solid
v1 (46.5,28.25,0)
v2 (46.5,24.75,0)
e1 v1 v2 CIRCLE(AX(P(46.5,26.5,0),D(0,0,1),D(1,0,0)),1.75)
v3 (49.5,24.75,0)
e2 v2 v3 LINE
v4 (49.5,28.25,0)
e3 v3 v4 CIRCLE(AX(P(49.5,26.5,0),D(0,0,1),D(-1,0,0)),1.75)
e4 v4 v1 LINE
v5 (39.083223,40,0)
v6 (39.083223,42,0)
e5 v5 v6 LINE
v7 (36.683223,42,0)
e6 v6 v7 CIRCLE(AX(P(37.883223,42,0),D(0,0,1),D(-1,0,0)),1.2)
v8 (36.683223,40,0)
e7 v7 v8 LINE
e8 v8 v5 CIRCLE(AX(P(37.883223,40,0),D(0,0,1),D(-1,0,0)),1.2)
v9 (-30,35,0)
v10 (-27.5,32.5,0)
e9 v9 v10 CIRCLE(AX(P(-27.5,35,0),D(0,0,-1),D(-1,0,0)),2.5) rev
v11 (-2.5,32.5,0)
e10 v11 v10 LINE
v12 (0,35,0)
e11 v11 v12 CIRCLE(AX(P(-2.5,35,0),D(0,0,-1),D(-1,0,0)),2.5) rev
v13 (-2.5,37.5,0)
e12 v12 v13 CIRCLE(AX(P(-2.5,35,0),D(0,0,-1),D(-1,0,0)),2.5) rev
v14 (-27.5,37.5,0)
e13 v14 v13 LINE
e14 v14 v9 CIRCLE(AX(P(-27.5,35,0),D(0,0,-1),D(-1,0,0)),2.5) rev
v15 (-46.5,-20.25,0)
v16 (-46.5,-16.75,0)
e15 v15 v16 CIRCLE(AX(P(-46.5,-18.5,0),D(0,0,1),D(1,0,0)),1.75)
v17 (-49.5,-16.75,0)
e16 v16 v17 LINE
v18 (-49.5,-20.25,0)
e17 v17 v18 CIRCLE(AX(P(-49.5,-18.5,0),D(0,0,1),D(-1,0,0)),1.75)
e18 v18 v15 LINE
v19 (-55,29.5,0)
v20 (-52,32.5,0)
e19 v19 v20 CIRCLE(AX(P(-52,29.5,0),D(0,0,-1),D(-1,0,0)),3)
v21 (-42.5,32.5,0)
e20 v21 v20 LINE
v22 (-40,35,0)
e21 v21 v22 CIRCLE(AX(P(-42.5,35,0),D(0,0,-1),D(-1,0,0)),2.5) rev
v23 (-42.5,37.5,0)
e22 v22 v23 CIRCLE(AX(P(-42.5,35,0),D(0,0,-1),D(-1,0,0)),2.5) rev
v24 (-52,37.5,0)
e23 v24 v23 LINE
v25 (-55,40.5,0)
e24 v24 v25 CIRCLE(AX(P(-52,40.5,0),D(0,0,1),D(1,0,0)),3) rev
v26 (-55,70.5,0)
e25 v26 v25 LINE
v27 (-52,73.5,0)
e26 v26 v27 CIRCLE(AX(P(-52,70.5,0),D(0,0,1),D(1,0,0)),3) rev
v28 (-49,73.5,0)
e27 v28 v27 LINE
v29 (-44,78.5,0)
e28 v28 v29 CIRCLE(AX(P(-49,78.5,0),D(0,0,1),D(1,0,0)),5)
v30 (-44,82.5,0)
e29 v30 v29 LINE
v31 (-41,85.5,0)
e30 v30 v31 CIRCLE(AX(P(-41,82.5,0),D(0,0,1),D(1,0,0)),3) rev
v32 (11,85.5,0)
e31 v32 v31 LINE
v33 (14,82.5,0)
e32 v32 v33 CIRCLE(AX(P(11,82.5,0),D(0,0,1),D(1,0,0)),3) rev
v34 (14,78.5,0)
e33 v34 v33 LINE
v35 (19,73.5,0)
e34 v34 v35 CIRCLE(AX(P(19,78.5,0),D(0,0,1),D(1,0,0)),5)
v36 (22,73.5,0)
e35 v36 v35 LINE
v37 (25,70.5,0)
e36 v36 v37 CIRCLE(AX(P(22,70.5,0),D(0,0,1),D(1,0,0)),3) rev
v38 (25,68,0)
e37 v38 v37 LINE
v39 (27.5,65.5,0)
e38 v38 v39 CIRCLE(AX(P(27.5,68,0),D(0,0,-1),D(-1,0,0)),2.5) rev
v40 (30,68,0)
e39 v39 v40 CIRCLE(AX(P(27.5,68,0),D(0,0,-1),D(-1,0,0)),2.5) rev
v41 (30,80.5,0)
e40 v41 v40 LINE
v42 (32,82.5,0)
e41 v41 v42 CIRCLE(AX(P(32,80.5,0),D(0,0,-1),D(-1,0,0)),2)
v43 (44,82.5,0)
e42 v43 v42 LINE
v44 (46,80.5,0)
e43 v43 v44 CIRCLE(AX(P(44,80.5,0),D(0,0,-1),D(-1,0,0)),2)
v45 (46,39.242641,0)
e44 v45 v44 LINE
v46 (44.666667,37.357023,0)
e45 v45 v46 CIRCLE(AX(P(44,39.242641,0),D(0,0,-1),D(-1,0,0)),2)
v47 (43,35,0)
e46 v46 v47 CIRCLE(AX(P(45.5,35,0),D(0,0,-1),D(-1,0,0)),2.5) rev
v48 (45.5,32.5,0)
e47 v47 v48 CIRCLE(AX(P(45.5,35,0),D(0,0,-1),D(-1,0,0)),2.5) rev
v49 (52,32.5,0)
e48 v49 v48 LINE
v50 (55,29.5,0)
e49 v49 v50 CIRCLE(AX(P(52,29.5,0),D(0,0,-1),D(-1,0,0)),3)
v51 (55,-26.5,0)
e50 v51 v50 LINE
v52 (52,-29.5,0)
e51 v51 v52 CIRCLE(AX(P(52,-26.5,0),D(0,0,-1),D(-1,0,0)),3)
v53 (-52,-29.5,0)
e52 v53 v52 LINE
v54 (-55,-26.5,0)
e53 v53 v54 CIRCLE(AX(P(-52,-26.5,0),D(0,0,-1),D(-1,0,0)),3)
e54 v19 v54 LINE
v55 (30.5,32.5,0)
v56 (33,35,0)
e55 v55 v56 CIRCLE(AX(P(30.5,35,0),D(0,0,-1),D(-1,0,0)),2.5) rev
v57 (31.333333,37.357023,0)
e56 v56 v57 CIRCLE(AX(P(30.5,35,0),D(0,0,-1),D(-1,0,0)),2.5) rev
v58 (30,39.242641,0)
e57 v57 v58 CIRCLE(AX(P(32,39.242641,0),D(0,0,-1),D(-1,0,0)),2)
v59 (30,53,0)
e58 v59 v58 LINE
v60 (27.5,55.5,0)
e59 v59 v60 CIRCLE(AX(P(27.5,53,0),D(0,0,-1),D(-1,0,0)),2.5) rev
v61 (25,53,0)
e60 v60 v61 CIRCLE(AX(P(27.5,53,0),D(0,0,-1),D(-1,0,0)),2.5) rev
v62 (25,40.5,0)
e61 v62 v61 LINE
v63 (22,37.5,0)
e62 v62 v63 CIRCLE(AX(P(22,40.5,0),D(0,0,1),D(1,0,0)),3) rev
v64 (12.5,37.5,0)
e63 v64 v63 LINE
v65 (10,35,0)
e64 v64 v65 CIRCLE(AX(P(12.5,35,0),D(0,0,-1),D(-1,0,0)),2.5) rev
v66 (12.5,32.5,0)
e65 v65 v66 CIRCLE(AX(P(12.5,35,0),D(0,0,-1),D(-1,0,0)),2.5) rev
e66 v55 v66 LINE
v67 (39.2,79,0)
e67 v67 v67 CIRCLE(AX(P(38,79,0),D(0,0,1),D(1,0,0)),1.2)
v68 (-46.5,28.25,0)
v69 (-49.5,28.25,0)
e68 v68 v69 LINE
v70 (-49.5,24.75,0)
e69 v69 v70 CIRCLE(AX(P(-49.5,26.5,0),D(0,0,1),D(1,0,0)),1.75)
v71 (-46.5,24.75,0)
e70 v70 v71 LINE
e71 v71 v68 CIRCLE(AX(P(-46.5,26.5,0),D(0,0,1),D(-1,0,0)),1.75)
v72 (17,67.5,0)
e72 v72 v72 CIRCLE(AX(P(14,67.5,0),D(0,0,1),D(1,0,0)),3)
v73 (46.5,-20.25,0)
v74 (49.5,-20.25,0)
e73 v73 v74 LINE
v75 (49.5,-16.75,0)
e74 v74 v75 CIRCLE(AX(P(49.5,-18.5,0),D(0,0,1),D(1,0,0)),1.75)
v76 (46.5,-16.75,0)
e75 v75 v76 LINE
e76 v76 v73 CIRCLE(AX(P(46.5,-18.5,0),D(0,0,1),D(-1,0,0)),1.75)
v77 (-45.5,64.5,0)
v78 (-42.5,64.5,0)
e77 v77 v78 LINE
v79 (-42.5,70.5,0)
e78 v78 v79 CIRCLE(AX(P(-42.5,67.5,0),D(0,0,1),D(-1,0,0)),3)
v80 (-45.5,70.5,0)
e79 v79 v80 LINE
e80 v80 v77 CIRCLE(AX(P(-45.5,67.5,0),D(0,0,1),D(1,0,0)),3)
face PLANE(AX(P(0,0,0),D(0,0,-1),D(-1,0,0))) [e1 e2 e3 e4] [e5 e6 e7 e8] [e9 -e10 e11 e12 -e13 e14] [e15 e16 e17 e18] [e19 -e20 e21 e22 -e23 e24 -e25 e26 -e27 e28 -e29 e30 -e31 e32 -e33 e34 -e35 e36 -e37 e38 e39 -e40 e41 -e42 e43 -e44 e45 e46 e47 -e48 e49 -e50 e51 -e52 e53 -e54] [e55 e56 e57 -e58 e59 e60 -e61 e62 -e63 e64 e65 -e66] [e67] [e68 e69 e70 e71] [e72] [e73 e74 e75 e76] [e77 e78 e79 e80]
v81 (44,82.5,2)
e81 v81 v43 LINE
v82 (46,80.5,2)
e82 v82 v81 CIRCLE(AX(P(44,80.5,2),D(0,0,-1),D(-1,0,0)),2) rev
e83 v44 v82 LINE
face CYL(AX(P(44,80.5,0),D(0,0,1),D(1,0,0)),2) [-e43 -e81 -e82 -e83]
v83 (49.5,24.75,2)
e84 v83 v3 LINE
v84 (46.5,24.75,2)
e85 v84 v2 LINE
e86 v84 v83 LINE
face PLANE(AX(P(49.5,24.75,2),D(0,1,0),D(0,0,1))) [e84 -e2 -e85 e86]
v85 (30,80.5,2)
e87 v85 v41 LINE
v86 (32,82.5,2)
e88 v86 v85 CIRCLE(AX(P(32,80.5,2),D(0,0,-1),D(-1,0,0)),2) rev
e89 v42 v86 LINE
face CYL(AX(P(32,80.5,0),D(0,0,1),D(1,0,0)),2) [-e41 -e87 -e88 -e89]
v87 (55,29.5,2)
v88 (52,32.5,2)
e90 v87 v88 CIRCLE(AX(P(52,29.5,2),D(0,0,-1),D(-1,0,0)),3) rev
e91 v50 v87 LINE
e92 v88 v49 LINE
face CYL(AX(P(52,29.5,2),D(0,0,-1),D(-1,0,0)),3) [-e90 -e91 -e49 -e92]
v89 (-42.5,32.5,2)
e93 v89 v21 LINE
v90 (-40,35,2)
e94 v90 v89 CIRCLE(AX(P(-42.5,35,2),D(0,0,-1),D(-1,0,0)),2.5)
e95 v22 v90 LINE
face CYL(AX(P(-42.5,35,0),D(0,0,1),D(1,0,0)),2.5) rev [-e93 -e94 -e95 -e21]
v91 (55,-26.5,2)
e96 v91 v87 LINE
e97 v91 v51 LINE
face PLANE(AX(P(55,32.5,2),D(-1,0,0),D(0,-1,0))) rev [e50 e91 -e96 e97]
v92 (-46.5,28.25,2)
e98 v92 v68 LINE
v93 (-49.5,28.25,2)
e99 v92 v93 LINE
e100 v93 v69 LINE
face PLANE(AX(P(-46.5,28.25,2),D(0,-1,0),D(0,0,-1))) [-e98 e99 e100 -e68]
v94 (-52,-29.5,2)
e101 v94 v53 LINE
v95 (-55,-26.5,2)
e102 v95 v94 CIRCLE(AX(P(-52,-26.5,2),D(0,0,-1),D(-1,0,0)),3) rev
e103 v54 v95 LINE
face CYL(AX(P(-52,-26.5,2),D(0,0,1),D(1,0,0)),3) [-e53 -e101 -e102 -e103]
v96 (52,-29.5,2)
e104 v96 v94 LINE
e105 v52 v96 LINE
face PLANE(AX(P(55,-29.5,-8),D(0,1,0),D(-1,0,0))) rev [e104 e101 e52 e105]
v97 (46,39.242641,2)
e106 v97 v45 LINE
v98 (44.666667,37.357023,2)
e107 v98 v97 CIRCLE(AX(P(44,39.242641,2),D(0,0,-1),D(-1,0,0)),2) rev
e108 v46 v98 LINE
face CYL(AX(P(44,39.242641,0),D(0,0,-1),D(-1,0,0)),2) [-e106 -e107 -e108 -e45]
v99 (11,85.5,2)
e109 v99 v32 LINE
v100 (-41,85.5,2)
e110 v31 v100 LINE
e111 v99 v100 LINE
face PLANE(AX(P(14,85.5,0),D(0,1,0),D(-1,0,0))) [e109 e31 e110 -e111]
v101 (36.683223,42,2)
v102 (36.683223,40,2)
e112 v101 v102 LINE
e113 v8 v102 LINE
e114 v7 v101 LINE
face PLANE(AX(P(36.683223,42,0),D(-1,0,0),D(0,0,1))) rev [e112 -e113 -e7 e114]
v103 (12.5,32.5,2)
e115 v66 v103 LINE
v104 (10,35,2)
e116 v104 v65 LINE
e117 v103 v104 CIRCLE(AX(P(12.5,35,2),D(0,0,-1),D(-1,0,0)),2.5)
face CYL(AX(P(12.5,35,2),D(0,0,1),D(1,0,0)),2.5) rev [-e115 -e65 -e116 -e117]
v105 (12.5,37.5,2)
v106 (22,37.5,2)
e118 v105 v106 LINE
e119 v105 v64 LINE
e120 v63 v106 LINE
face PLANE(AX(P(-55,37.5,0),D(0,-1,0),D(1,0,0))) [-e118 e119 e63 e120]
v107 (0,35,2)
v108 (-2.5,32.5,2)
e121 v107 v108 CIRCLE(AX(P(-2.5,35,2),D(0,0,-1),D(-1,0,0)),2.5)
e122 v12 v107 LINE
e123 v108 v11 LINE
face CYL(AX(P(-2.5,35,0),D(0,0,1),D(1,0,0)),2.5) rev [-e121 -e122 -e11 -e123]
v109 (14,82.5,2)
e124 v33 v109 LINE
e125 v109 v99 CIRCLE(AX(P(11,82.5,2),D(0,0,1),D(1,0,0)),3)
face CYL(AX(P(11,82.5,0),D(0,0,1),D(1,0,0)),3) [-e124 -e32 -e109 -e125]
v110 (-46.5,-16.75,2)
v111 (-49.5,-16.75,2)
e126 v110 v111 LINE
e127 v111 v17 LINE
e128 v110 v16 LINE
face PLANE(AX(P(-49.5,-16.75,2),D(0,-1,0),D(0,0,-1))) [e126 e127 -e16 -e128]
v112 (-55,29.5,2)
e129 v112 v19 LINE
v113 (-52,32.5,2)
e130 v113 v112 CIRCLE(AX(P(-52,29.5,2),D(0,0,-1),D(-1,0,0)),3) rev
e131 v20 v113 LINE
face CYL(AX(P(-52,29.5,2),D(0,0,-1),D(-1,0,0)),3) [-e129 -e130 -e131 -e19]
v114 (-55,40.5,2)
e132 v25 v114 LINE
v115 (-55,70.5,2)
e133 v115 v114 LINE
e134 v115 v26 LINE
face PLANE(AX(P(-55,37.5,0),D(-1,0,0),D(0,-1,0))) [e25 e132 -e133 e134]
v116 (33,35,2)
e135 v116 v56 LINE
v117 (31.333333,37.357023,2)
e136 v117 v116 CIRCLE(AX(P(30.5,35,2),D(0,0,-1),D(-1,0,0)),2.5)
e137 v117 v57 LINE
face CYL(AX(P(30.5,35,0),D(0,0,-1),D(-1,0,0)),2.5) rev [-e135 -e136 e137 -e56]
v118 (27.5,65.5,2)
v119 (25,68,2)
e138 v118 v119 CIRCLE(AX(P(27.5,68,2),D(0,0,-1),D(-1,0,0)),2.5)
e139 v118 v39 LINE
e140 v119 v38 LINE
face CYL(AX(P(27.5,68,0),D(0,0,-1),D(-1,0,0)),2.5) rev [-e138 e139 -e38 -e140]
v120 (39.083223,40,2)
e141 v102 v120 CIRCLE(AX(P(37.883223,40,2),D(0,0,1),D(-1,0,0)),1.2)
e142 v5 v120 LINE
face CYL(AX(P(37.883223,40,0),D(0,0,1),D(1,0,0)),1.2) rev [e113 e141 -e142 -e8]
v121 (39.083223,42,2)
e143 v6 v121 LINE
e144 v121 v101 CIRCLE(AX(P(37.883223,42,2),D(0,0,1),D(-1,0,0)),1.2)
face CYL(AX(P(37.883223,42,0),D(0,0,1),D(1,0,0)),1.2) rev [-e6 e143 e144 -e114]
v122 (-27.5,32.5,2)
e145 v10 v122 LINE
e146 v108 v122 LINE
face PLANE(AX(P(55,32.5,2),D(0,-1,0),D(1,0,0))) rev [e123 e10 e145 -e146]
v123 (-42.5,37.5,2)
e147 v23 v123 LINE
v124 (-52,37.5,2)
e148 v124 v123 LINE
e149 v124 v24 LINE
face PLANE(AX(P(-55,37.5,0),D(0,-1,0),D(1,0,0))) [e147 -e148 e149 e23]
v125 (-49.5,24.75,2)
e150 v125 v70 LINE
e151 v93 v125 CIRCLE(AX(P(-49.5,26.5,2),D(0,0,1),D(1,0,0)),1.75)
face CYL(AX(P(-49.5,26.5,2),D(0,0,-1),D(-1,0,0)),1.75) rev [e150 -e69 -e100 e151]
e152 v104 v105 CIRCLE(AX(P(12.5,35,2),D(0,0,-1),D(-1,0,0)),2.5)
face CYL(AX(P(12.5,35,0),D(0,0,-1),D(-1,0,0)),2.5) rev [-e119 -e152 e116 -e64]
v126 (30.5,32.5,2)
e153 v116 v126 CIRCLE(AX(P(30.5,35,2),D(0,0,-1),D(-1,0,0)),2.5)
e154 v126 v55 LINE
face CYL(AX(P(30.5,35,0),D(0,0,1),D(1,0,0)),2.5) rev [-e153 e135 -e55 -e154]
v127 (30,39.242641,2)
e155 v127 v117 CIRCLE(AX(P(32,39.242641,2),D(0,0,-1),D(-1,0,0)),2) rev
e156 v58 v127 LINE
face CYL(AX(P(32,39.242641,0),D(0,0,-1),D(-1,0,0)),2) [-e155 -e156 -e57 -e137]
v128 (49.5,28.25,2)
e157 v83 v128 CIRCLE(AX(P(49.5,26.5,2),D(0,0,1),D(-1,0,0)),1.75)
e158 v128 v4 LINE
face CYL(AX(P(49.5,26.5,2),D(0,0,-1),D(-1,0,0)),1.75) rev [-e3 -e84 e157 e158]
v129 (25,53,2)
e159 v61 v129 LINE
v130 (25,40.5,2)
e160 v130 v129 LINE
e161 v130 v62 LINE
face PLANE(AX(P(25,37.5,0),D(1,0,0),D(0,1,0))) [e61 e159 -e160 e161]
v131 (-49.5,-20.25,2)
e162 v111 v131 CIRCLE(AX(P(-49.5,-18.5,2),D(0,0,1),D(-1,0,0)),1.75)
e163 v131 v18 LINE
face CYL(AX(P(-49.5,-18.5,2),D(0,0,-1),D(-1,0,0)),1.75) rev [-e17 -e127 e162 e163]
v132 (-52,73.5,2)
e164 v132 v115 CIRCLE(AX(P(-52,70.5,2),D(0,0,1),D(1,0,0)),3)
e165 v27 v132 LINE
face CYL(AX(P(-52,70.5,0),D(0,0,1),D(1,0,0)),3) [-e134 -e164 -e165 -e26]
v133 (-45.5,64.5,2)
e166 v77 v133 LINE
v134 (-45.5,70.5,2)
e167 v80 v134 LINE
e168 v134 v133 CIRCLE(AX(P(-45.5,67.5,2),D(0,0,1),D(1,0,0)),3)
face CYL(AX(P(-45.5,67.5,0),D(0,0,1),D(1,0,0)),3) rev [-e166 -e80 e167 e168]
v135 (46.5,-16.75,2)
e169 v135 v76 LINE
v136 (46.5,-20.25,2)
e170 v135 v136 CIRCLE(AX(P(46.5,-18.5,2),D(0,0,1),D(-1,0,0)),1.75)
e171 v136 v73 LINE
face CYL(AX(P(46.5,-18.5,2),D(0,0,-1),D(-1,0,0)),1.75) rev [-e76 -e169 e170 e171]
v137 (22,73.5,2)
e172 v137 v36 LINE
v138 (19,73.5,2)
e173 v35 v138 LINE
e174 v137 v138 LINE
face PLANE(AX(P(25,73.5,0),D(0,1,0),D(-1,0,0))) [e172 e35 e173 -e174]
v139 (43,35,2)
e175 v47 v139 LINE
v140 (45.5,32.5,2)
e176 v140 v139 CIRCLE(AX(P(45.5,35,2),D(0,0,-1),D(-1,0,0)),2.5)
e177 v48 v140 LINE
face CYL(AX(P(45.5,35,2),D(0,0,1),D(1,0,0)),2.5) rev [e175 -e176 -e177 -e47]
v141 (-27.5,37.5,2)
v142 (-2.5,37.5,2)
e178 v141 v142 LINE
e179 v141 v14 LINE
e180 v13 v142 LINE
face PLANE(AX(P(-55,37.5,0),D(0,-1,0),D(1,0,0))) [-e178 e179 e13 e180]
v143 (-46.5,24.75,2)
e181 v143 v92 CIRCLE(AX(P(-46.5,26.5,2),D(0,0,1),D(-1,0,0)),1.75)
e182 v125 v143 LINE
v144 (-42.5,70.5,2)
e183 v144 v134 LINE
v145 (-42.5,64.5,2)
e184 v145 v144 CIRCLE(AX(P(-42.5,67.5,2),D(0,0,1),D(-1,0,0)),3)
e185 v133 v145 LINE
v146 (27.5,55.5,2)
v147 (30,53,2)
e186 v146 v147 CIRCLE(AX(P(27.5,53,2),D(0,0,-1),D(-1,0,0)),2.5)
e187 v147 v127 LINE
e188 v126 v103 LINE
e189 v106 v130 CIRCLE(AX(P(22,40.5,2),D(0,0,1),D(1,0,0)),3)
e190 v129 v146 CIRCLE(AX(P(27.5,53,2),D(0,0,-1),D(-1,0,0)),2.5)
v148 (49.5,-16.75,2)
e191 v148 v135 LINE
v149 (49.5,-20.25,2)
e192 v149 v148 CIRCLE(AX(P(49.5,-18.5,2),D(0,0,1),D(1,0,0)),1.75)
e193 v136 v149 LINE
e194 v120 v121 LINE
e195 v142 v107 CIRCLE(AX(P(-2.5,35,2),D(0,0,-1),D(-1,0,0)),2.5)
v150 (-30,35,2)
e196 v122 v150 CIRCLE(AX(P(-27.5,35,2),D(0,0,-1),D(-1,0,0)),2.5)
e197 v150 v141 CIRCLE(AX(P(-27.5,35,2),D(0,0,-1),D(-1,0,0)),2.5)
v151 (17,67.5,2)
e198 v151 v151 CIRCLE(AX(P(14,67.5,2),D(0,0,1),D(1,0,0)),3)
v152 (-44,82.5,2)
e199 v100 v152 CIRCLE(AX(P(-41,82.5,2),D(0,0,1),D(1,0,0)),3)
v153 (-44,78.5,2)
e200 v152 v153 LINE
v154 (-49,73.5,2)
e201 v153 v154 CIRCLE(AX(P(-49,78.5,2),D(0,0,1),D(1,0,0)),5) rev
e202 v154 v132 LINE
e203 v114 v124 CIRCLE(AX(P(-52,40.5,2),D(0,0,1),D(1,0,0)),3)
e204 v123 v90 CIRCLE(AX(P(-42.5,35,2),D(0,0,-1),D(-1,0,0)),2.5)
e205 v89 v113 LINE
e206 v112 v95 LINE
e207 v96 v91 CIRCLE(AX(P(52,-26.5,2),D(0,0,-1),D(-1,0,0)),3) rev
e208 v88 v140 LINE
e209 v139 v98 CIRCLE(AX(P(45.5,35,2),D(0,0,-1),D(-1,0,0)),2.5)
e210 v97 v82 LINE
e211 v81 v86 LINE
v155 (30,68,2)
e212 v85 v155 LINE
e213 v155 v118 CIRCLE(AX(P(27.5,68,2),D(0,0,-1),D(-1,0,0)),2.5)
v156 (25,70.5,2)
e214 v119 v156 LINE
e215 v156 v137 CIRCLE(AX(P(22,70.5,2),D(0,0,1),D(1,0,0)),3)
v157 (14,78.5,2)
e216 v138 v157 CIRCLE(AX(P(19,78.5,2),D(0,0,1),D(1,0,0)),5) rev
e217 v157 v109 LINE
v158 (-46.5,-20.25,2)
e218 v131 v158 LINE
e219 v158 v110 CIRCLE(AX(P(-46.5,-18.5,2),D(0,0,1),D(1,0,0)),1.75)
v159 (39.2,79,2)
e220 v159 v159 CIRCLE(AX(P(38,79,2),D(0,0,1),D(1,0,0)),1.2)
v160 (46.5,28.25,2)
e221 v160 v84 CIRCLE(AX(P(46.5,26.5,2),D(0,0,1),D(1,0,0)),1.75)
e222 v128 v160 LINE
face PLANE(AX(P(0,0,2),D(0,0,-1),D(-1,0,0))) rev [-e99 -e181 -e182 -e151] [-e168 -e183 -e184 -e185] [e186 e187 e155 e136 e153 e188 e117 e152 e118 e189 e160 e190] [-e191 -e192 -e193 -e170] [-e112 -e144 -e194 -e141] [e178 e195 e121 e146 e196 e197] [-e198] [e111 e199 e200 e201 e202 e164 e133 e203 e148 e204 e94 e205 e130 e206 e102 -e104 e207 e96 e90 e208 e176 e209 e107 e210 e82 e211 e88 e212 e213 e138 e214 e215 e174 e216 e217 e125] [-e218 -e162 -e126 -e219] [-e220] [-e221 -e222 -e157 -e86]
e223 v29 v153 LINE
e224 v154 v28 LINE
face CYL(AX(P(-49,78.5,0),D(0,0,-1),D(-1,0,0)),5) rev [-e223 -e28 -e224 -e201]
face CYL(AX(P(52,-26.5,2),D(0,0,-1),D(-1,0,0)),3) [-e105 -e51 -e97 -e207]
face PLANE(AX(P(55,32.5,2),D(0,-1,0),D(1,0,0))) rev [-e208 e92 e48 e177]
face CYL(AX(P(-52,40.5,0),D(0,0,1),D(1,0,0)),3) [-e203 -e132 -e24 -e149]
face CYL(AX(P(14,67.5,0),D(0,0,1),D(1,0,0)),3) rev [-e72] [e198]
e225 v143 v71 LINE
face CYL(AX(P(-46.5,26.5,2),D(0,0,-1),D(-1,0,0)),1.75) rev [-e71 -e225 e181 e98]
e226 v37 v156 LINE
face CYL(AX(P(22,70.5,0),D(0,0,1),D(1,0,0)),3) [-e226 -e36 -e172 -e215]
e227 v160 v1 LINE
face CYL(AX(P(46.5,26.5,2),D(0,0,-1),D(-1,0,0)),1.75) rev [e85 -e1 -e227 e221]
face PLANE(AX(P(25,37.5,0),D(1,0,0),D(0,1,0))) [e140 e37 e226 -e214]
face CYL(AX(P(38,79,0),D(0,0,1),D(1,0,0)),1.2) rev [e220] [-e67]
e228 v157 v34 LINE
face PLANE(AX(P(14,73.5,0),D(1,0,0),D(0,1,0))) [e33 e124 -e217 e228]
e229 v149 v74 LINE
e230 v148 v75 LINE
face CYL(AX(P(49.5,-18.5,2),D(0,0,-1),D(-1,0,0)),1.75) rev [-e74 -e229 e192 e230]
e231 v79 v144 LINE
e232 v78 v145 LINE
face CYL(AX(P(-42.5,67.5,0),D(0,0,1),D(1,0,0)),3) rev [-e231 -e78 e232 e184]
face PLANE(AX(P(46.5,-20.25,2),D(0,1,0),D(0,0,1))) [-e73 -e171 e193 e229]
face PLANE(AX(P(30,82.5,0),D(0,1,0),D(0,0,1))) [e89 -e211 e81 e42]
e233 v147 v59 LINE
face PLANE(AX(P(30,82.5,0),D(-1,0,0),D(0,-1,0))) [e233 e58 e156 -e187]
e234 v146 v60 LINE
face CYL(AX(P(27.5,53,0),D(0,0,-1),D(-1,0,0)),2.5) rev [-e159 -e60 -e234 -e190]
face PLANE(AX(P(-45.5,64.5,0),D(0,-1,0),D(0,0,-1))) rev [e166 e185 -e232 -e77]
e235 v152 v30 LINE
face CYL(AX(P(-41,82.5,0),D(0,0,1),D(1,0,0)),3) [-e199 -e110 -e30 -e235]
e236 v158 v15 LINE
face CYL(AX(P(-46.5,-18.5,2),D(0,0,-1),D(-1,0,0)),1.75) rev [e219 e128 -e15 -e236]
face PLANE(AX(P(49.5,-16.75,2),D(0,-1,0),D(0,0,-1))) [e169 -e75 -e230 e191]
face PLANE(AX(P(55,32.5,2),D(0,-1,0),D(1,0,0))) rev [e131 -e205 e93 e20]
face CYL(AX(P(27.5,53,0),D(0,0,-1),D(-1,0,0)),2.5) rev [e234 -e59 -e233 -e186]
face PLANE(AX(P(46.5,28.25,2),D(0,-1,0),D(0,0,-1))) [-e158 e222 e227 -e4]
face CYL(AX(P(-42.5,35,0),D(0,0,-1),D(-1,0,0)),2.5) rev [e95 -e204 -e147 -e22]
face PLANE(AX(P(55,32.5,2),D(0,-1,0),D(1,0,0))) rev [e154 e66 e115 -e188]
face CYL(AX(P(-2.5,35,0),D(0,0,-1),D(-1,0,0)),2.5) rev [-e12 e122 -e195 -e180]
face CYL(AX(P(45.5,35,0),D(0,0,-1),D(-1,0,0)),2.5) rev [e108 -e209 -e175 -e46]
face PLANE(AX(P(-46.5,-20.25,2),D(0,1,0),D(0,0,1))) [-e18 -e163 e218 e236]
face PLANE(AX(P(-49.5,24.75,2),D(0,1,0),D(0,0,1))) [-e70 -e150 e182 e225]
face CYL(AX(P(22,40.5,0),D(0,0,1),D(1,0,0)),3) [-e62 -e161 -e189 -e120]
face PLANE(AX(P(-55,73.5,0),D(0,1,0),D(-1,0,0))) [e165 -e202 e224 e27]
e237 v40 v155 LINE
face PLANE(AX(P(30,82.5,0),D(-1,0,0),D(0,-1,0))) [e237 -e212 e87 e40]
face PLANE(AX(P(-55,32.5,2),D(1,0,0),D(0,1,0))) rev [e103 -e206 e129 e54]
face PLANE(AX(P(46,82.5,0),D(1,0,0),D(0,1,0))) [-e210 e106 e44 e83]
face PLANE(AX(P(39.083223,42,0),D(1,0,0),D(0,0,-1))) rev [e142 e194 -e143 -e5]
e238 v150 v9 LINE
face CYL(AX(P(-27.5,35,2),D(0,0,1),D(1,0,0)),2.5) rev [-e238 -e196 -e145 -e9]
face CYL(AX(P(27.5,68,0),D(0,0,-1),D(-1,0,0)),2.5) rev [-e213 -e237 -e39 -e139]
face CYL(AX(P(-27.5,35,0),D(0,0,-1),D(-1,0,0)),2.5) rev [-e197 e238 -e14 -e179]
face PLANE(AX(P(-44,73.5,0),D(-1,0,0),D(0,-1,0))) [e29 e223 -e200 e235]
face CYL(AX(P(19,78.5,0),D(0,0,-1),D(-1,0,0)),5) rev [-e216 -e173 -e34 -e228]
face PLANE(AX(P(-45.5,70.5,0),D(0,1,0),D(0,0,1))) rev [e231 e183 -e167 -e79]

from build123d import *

# Parameters (mm, degrees)
SKETCH_1_W          = 110
SKETCH_1_H          = 65
EXTRUDE_1_DEPTH     = 2
FILLET_1_R          = 3
SKETCH_2_R          = 3
EXTRUDE_2_DEPTH     = 2
FILLET_5_R          = 3
FILLET_6_R          = 5
SKETCH_4_W          = 10
SKETCH_4_H          = 5
EXTRUDE_4_DEPTH     = 2
FILLET_7_R          = 2.5
SKETCH_5_W          = 16
SKETCH_5_H          = 45
SKETCH_5_R          = 1.2
EXTRUDE_5_DEPTH     = 2
SKETCH_6_W          = 10
SKETCH_6_H          = 5
SKETCH_6_W_2        = 5
SKETCH_6_H_2        = 10
EXTRUDE_6_DEPTH     = 2
FILLET_8_R          = 2.5
FILLET_9_R          = 2
SKETCH_7_W          = 110
SKETCH_7_H          = 3
CUT_EXTRUDE_1_DEPTH = 10
FILLET_10_R         = 3


with BuildPart() as part:
    # ｽｹｯﾁ1 → ﾎﾞｽ - 押し出し1 (new body)
    with BuildSketch(Plane.XY):
        Rectangle(SKETCH_1_W, SKETCH_1_H)
        with BuildLine():
            Line((-49.5, 24.75), (-46.5, 24.75))
            ThreePointArc((-46.5, 24.75), (-44.75, 26.5), (-46.5, 28.25))
            Line((-46.5, 28.25), (-49.5, 28.25))
            ThreePointArc((-49.5, 28.25), (-51.25, 26.5), (-49.5, 24.75))
        make_face(mode=Mode.SUBTRACT)
        with BuildLine():
            Line((-46.5, -20.25), (-49.5, -20.25))
            ThreePointArc((-49.5, -20.25), (-51.25, -18.5), (-49.5, -16.75))
            Line((-49.5, -16.75), (-46.5, -16.75))
            ThreePointArc((-46.5, -16.75), (-44.75, -18.5), (-46.5, -20.25))
        make_face(mode=Mode.SUBTRACT)
        with BuildLine():
            Line((46.5, -20.25), (49.5, -20.25))
            ThreePointArc((49.5, -20.25), (51.25, -18.5), (49.5, -16.75))
            Line((49.5, -16.75), (46.5, -16.75))
            ThreePointArc((46.5, -16.75), (44.75, -18.5), (46.5, -20.25))
        make_face(mode=Mode.SUBTRACT)
        with BuildLine():
            Line((46.5, 28.25), (49.5, 28.25))
            ThreePointArc((49.5, 28.25), (51.25, 26.5), (49.5, 24.75))
            Line((49.5, 24.75), (46.5, 24.75))
            ThreePointArc((46.5, 24.75), (44.75, 26.5), (46.5, 28.25))
        make_face(mode=Mode.SUBTRACT)
    extrude(amount=EXTRUDE_1_DEPTH)

    # ﾌｨﾚｯﾄ1
    fillet_1_edges = [part.edges().sort_by_distance(p)[0] for p in [
        (-55, 32.5, 1),
        (55, 32.5, 1),
    ]]
    fillet(fillet_1_edges, radius=FILLET_1_R)



with BuildPart() as body_2:
    # ｽｹｯﾁ2 → ﾎﾞｽ - 押し出し2 (new body)
    with BuildSketch(Plane.XY.offset(2)):
        Polygon((-55, 37.5), (25, 37.5), (25, 73.5), (14, 73.5), (14, 85.5), (-44, 85.5), (-44, 73.5), (-55, 73.5), align=None)
        with Locations((14, 67.5)):
            Circle(SKETCH_2_R, mode=Mode.SUBTRACT)
        with BuildLine():
            Line((-45.5, 64.5), (-42.5, 64.5))
            ThreePointArc((-42.5, 64.5), (-39.5, 67.5), (-42.5, 70.5))
            Line((-42.5, 70.5), (-45.5, 70.5))
            ThreePointArc((-45.5, 70.5), (-48.5, 67.5), (-45.5, 64.5))
        make_face(mode=Mode.SUBTRACT)
    extrude(amount=-EXTRUDE_2_DEPTH)

    # ﾌｨﾚｯﾄ5
    fillet_5_edges = [body_2.edges().sort_by_distance(p)[0] for p in [
        (25, 37.5, 1),
        (-55, 37.5, 1),
        (-55, 73.5, 1),
        (-44, 85.5, 1),
        (14, 85.5, 1),
        (25, 73.5, 1),
    ]]
    fillet(fillet_5_edges, radius=FILLET_5_R)

    # ﾌｨﾚｯﾄ6
    fillet_6_edges = [body_2.edges().sort_by_distance(p)[0] for p in [
        (-44, 73.5, 1),
        (14, 73.5, 1),
    ]]
    fillet(fillet_6_edges, radius=FILLET_6_R)


with BuildPart() as part_1:
    add(part.part)

    add(body_2.part)  # ﾎﾞｽ - 押し出し4 merges body 2
    # ｽｹｯﾁ4 → ﾎﾞｽ - 押し出し4 (add)
    with BuildSketch(Plane.XY.offset(2)):
        with Locations((-35, 35)):
            Rectangle(SKETCH_4_W, SKETCH_4_H)
        with Locations((5, 35)):
            Rectangle(SKETCH_4_W, SKETCH_4_H)
    extrude(amount=-EXTRUDE_4_DEPTH)

    # ﾌｨﾚｯﾄ7
    fillet_7_edges = [part_1.edges().sort_by_distance(p)[0] for p in [
        (10, 37.5, 1),
        (10, 32.5, 1),
        (0, 37.5, 1),
        (0, 32.5, 1),
        (-30, 37.5, 1),
        (-30, 32.5, 1),
        (-40, 37.5, 1),
        (-40, 32.5, 1),
    ]]
    fillet(fillet_7_edges, radius=FILLET_7_R - 0.0001)  # a hair under: the kernel refuses the full size



with BuildPart() as body_2_2:
    # ｽｹｯﾁ5 → ﾎﾞｽ - 押し出し5 (new body)
    with BuildSketch(Plane.XY.offset(2)):
        with Locations((38, 60)):
            Rectangle(SKETCH_5_W, SKETCH_5_H)
        with Locations((38, 79)):
            Circle(SKETCH_5_R, mode=Mode.SUBTRACT)
        with BuildLine():
            Line((36.683223365, 42), (36.683223365, 40))
            ThreePointArc((36.683223365, 40), (37.883223365, 38.8), (39.083223365, 40))
            Line((39.083223365, 40), (39.083223365, 42))
            ThreePointArc((39.083223365, 42), (37.883223365, 43.2), (36.683223365, 42))
        make_face(mode=Mode.SUBTRACT)
    extrude(amount=-EXTRUDE_5_DEPTH)


with BuildPart() as part_2:
    add(part_1.part)

    add(body_2_2.part)  # ﾎﾞｽ - 押し出し6 merges body 2 2
    # ｽｹｯﾁ6 → ﾎﾞｽ - 押し出し6 (add)
    with BuildSketch(Plane.XY.offset(2)):
        with Locations((38, 35)):
            Rectangle(SKETCH_6_W, SKETCH_6_H)
        with Locations((27.5, 60.5)):
            Rectangle(SKETCH_6_W_2, SKETCH_6_H_2)
    extrude(amount=-EXTRUDE_6_DEPTH)

    # ﾌｨﾚｯﾄ8
    fillet_8_edges = [part_2.edges().sort_by_distance(p)[0] for p in [
        (43, 32.5, 1),
        (43, 37.5, 1),
        (33, 32.5, 1),
        (33, 37.5, 1),
        (30, 55.5, 1),
        (25, 55.5, 1),
        (25, 65.5, 1),
        (30, 65.5, 1),
    ]]
    fillet(fillet_8_edges, radius=FILLET_8_R - 0.0001)  # a hair under: the kernel refuses the full size

    # ﾌｨﾚｯﾄ9
    fillet_9_edges = [part_2.edges().sort_by_distance(p)[0] for p in [
        (46, 82.5, 1),
        (30, 82.5, 1),
        (46, 37.5, 1),
        (30, 37.5, 1),
    ]]
    fillet(fillet_9_edges, radius=FILLET_9_R)

    # ｽｹｯﾁ7 → ｶｯﾄ - 押し出し1 (cut)
    with BuildSketch(Plane.XY.offset(2)):
        with Locations((0, -31)):
            Rectangle(SKETCH_7_W, SKETCH_7_H)
    extrude(amount=-CUT_EXTRUDE_1_DEPTH, mode=Mode.SUBTRACT)

    # ﾌｨﾚｯﾄ10
    fillet_10_edges = [part_2.edges().sort_by_distance(p)[0] for p in [
        (55, -29.5, 1),
        (-55, -29.5, 1),
    ]]
    fillet(fillet_10_edges, radius=FILLET_10_R)


solid = part_2.part
